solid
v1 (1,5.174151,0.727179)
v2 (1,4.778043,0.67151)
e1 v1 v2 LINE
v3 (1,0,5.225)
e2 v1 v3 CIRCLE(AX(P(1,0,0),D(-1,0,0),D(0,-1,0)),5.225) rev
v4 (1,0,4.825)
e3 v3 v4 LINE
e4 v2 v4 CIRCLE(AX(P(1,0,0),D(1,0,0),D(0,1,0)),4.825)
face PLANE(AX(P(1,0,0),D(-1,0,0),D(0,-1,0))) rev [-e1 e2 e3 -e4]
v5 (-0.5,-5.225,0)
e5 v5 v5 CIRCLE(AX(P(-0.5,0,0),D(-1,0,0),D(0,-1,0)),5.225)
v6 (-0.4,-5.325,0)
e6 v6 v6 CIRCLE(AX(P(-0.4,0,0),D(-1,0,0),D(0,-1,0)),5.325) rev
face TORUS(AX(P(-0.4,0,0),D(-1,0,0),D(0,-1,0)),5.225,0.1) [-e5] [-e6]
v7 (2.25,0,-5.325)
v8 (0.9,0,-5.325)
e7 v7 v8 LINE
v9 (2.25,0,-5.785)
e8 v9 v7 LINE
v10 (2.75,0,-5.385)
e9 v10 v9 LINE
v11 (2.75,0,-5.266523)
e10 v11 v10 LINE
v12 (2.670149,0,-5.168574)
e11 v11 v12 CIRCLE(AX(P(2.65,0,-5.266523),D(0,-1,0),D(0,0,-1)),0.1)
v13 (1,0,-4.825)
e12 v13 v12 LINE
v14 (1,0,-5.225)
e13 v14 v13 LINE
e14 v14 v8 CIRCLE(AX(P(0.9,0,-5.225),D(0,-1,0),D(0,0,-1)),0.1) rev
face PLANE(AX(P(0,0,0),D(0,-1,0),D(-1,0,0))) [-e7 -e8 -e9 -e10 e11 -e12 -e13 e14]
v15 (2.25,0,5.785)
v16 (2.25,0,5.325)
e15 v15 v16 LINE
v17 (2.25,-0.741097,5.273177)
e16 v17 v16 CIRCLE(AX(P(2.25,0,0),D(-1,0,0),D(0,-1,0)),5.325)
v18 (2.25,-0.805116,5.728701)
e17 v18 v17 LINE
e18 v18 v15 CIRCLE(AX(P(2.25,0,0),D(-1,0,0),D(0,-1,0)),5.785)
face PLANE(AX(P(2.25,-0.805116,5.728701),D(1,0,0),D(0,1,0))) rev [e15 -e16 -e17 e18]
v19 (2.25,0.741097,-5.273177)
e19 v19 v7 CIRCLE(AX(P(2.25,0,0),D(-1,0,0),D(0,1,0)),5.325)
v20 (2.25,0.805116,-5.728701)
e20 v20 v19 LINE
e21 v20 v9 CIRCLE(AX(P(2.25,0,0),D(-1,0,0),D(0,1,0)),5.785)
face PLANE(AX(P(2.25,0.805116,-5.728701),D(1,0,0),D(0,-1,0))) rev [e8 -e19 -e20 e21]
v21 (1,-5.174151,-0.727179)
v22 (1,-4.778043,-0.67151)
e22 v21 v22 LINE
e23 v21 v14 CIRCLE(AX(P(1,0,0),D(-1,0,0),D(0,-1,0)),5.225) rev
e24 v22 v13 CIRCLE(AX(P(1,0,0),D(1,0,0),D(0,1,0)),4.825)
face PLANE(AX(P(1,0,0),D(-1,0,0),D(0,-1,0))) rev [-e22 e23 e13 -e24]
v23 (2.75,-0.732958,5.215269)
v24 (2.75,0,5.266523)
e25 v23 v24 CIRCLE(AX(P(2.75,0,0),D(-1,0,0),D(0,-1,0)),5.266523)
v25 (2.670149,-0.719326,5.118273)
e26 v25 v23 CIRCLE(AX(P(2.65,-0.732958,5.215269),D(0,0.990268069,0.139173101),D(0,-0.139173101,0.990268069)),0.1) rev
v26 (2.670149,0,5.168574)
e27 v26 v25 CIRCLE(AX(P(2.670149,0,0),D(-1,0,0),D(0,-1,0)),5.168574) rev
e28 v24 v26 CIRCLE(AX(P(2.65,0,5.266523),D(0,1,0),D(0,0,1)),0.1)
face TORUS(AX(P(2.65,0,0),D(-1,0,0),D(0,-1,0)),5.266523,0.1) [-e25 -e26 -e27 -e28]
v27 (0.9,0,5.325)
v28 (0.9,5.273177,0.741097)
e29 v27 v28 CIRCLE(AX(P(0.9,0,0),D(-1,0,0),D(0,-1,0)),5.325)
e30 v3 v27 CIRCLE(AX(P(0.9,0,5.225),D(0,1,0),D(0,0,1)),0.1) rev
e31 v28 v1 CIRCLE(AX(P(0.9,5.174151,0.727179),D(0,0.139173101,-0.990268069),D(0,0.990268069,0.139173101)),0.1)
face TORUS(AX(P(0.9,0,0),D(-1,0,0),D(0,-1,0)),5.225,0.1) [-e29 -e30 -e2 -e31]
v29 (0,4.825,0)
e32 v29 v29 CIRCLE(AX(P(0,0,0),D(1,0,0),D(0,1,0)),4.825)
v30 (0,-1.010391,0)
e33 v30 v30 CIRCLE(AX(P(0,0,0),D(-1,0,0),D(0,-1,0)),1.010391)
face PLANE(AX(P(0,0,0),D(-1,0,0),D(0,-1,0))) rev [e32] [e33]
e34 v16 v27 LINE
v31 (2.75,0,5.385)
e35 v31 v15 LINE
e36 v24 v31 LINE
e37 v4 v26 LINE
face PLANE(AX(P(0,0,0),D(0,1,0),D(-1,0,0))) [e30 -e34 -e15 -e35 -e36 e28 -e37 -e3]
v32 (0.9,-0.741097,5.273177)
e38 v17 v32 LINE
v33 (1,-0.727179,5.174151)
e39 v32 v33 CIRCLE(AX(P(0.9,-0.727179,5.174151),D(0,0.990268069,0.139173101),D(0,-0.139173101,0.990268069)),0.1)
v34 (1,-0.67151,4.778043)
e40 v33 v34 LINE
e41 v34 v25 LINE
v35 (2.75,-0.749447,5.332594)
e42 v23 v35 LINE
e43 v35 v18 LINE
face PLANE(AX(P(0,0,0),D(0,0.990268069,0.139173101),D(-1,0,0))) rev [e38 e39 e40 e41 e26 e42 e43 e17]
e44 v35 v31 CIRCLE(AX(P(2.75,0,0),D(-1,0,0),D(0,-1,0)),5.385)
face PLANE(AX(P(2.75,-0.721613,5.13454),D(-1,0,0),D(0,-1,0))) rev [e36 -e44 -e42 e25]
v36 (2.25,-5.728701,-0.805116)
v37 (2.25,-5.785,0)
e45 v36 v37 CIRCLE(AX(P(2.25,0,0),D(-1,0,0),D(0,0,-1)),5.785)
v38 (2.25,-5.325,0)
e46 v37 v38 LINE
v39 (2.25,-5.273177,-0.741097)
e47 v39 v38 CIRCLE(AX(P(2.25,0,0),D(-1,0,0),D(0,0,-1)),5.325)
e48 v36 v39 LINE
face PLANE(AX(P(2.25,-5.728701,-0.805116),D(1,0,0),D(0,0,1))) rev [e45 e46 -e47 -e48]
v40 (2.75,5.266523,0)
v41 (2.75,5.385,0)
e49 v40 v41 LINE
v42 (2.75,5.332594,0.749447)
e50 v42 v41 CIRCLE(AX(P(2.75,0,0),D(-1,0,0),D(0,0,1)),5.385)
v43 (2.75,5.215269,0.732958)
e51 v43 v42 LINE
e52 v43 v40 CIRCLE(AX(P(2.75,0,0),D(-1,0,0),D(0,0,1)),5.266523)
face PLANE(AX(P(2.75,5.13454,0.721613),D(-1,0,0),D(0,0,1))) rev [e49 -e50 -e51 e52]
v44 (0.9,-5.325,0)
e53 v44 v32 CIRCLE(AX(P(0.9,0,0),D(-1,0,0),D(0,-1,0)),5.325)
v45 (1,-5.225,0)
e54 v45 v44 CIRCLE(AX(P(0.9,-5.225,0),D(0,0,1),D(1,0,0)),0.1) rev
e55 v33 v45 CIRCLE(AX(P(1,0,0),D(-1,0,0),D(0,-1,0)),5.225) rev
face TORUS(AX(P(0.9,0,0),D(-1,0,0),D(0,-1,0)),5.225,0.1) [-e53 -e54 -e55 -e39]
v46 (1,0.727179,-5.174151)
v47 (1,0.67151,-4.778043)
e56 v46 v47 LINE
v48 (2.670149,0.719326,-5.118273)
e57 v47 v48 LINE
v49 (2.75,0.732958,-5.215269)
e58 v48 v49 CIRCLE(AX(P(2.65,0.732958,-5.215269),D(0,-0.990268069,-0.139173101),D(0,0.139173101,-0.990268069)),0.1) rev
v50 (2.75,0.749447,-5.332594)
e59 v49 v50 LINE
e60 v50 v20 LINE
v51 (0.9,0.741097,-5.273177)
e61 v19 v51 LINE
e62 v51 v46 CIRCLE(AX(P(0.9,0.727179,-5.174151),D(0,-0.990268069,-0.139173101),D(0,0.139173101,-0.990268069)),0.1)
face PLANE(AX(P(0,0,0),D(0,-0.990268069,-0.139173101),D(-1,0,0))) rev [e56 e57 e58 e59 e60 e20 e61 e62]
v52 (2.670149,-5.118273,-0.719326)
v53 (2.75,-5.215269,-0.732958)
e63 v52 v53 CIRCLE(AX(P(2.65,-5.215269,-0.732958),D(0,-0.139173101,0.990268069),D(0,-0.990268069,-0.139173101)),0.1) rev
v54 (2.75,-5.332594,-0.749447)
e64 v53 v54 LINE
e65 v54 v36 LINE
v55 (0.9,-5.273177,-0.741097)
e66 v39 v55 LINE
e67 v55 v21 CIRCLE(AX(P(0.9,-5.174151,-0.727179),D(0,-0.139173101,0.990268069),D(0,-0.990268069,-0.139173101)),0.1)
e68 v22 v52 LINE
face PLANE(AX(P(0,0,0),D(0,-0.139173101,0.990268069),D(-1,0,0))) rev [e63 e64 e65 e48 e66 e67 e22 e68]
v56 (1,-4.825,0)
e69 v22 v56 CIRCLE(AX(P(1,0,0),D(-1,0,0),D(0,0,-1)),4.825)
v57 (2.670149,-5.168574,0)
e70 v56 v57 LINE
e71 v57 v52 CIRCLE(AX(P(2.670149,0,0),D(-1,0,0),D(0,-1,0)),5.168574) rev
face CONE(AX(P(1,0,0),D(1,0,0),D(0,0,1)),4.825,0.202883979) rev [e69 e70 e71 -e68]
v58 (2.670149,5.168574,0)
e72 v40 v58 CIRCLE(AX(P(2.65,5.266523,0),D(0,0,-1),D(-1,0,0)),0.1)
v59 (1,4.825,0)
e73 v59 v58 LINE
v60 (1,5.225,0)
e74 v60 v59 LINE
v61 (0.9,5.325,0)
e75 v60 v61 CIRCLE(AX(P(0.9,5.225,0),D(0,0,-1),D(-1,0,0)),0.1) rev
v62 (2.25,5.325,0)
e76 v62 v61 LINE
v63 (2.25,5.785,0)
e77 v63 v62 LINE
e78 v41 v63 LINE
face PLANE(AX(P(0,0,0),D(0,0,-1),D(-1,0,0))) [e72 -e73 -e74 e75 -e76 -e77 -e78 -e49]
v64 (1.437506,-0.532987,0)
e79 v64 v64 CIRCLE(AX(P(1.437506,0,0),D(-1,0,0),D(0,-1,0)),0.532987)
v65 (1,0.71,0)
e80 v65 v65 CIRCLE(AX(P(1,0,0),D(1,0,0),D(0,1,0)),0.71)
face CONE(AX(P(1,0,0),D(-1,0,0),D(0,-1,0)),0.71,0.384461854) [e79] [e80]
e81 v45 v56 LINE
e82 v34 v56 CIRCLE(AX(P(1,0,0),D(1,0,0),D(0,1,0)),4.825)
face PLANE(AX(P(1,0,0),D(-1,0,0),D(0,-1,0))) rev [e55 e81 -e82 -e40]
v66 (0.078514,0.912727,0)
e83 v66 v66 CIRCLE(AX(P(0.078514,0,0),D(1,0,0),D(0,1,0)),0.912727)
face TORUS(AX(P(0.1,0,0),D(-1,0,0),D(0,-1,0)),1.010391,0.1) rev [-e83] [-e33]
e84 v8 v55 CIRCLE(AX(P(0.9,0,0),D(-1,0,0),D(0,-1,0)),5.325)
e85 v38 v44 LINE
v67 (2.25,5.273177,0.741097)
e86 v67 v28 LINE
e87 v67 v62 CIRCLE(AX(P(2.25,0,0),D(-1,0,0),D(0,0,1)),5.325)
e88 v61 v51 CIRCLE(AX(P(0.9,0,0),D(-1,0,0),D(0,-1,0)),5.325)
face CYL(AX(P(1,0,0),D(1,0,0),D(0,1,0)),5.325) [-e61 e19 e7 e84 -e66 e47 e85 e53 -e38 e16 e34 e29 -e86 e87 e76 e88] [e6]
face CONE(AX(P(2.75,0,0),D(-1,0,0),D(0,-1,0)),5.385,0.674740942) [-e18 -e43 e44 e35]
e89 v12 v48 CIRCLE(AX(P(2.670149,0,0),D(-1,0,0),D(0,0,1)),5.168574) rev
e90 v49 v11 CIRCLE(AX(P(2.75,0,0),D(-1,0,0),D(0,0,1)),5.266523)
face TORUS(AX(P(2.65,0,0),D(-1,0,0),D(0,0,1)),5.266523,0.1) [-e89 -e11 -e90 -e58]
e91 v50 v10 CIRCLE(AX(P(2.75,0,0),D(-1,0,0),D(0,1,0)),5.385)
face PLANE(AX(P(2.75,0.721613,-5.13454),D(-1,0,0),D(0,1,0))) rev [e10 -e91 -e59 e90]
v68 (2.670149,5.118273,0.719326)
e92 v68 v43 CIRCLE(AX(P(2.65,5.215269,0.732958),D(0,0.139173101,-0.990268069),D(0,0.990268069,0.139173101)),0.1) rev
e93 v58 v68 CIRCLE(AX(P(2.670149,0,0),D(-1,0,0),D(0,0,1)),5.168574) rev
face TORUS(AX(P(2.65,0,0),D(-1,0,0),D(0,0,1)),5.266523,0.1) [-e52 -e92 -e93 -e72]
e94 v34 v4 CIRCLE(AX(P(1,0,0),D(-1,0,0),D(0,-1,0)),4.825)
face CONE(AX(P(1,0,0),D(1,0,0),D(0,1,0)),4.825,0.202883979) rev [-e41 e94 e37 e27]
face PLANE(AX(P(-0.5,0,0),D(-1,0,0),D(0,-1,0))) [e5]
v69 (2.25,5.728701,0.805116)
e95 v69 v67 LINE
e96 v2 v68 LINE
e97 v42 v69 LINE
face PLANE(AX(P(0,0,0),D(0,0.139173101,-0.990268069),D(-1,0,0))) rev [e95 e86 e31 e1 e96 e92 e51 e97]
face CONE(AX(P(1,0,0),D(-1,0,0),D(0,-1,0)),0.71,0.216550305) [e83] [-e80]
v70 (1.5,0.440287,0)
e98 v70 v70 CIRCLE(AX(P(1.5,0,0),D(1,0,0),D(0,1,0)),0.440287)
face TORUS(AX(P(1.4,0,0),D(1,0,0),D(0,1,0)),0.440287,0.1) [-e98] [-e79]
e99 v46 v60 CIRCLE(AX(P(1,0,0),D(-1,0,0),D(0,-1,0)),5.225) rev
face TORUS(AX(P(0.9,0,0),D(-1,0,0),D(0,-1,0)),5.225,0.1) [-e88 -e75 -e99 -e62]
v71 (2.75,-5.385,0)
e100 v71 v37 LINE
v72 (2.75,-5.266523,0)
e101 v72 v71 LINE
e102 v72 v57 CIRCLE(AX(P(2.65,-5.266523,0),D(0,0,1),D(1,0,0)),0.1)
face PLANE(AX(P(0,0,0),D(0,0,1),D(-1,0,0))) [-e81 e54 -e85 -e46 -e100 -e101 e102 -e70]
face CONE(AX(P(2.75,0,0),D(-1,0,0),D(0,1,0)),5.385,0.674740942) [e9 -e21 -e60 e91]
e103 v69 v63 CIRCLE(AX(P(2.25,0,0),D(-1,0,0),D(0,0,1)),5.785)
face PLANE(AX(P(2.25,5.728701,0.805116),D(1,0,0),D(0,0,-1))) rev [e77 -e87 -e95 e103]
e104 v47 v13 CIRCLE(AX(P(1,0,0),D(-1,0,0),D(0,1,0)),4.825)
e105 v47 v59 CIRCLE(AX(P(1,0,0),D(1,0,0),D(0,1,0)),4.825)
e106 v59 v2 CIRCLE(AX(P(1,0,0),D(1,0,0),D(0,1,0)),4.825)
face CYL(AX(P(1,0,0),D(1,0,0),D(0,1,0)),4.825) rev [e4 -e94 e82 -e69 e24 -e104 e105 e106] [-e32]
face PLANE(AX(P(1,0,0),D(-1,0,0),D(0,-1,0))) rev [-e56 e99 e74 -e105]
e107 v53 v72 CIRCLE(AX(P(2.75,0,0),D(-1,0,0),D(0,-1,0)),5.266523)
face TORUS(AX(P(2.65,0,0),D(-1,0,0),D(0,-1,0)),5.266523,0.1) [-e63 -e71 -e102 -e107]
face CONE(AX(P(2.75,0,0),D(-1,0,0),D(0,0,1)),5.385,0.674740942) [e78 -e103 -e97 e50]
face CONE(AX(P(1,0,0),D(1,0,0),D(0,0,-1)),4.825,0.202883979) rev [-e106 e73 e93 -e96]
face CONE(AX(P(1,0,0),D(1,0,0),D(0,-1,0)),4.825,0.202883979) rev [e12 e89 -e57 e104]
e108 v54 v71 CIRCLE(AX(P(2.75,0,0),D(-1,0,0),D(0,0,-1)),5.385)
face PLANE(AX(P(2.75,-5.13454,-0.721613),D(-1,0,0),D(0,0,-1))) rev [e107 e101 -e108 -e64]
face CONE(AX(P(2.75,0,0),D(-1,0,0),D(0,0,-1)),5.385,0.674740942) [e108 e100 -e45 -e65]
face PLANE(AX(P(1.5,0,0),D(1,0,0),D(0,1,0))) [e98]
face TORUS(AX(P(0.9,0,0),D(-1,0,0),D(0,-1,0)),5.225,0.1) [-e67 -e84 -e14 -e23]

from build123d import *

# Parameters (mm, degrees)
REVOLVE6_ANGLE    = 8
CIRPATTERN2_COUNT = 4
FILLET2_R         = 0.1


with BuildPart() as part:
    # Sketch1 → Revolve2 (revolve)
    with BuildSketch(Plane.XY):
        Polygon((1, 5.325), (0, 5.325), (-0.5, 5.325), (-0.5, 4.885), (-0.5, 1.49), (-0.5, 0), (0.25, 0), (1, 0), (1.5, 0), (1.5, 0.507702176), (1, 0.71), (0, 0.93), (0, 4.825), (1, 4.825), align=None)
    revolve(axis=Axis((1, 0, 0), (-1, 0, 0)))

    # Sketch4 → Revolve6 (revolve)
    with BuildSketch(Plane.XY):
        Polygon((2.75, 5.185), (2.75, 5.385), (2.25, 5.785), (2.25, 5.325), (1, 5.325), (1, 5.185), (1, 4.825), align=None)
    revolve6 = revolve(axis=Axis((0, 0, 0), (1, 0, 0)), revolution_arc=REVOLVE6_ANGLE)

    # CirPattern2: Revolve6 ×4 about axis
    cirpattern2_axis = Axis((0, 0, 0), (-1, 0, 0))
    for i in range(1, CIRPATTERN2_COUNT):
        add(revolve6.rotate(cirpattern2_axis, i * 360 / CIRPATTERN2_COUNT))

    # Fillet2
    # the kernel refuses this fillet: 0.1 mm, written as the material it adds along each edge
    with BuildSketch(Plane(origin=(0, 0, 0), x_dir=(0, 1, 0), z_dir=(0, 0, 1))) as fillet2_piece_1:
        with BuildLine():
            CenterArc((0.93 + FILLET2_R * 0.803914058894, -FILLET2_R), FILLET2_R, 90, 77.592581473)
            Line((0.93 - FILLET2_R * 0.172730407811, -FILLET2_R * 0.785138217325), (0.93, 0))
            Line((0.93, 0), (0.93 + FILLET2_R * 0.803914058894, 0))
        make_face()
    revolve(axis=Axis((0, 0, 0), (-1, 0, 0)))
    # the kernel refuses this fillet: 0.1 mm, written as the material it takes off along each edge
    with BuildSketch(Plane(origin=(1.5, 0, 0), x_dir=(0, 1, 0), z_dir=(0, 0, 1))) as fillet2_2_piece_1:
        with BuildLine():
            CenterArc((0.507702176 - FILLET2_R * 0.674152532906, FILLET2_R), FILLET2_R, 270, 67.971958378)
            Line((0.507702176 - FILLET2_R * 0.674152532906, 0), (0.507702176, 0))
            Line((0.507702176, 0), (0.507702176 + FILLET2_R * 0.252847871179, FILLET2_R * 0.62493967042))
        make_face()
    revolve(axis=Axis((1.5, 0, 0), (-1, 0, 0)), mode=Mode.SUBTRACT)
    with BuildSketch(Plane(origin=(1, 0, 0), x_dir=(0, 1, 0), z_dir=(0, 0, 1))) as fillet2_2_piece_2:
        with BuildLine():
            CenterArc((5.325 - FILLET2_R, FILLET2_R), FILLET2_R, 270, 90)
            Line((5.325, FILLET2_R), (5.325, 0))
            Line((5.325, 0), (5.325 - FILLET2_R, 0))
        make_face()
    revolve(axis=Axis((1, 0, 0), (-1, 0, 0)), revolution_arc=82, mode=Mode.SUBTRACT)
    with BuildSketch(Plane(origin=(2.75, 0, 0), x_dir=(0, -0.03929693023506649, -0.9992275773186509), z_dir=(0, -0.9992275773186509, 0.03929693023506649))) as fillet2_2_piece_3:
        with BuildLine():
            CenterArc((5.185 + FILLET2_R * 0.815225657351, -FILLET2_R), FILLET2_R, 90, 78.375604276)
            Line((5.185 + FILLET2_R * 0.815225657351, 0), (5.185, 0))
            Line((5.185, 0), (5.185 - FILLET2_R * 0.164263887349, -FILLET2_R * 0.798505007947))
        make_face()
    revolve(axis=Axis((2.75, 0, 0), (1, 0, 0)), revolution_arc=12.50425629, mode=Mode.SUBTRACT)
    with BuildSketch(Plane(origin=(1, 0, 0), x_dir=(0, 0, -1), z_dir=(0, 1, 0))) as fillet2_2_piece_4:
        with BuildLine():
            CenterArc((5.325 - FILLET2_R, FILLET2_R), FILLET2_R, 270, 90)
            Line((5.325, FILLET2_R), (5.325, 0))
            Line((5.325, 0), (5.325 - FILLET2_R, 0))
        make_face()
    revolve(axis=Axis((1, 0, 0), (-1, 0, 0)), revolution_arc=82, mode=Mode.SUBTRACT)
    with BuildSketch(Plane(origin=(2.75, 0, 0), x_dir=(0, -0.9992275773186509, 0.039296930235066474), z_dir=(0, 0.039296930235066474, 0.9992275773186509))) as fillet2_2_piece_5:
        with BuildLine():
            CenterArc((5.185 + FILLET2_R * 0.815225657351, -FILLET2_R), FILLET2_R, 90, 78.375604276)
            Line((5.185 + FILLET2_R * 0.815225657351, 0), (5.185, 0))
            Line((5.185, 0), (5.185 - FILLET2_R * 0.164263887349, -FILLET2_R * 0.798505007947))
        make_face()
    revolve(axis=Axis((2.75, 0, 0), (1, 0, 0)), revolution_arc=12.50425629, mode=Mode.SUBTRACT)
    with BuildSketch(Plane(origin=(1, 0, 0), x_dir=(0, -1, 0), z_dir=(0, 0, -1))) as fillet2_2_piece_6:
        with BuildLine():
            CenterArc((5.325 - FILLET2_R, FILLET2_R), FILLET2_R, 270, 90)
            Line((5.325, FILLET2_R), (5.325, 0))
            Line((5.325, 0), (5.325 - FILLET2_R, 0))
        make_face()
    revolve(axis=Axis((1, 0, 0), (-1, 0, 0)), revolution_arc=82, mode=Mode.SUBTRACT)
    with BuildSketch(Plane(origin=(2.75, 0, 0), x_dir=(0, 0.039296930235066384, 0.9992275773186509), z_dir=(0, 0.9992275773186509, -0.039296930235066384))) as fillet2_2_piece_7:
        with BuildLine():
            CenterArc((5.185 + FILLET2_R * 0.815225657351, -FILLET2_R), FILLET2_R, 90, 78.375604276)
            Line((5.185 + FILLET2_R * 0.815225657351, 0), (5.185, 0))
            Line((5.185, 0), (5.185 - FILLET2_R * 0.164263887349, -FILLET2_R * 0.798505007947))
        make_face()
    revolve(axis=Axis((2.75, 0, 0), (1, 0, 0)), revolution_arc=12.50425629, mode=Mode.SUBTRACT)
    with BuildSketch(Plane(origin=(1, 0, 0), x_dir=(0, 0, 1), z_dir=(0, -1, 0))) as fillet2_2_piece_8:
        with BuildLine():
            CenterArc((5.325 - FILLET2_R, FILLET2_R), FILLET2_R, 270, 90)
            Line((5.325, FILLET2_R), (5.325, 0))
            Line((5.325, 0), (5.325 - FILLET2_R, 0))
        make_face()
    revolve(axis=Axis((1, 0, 0), (-1, 0, 0)), revolution_arc=82, mode=Mode.SUBTRACT)
    with BuildSketch(Plane(origin=(2.75, 0, 0), x_dir=(0, 0.9992275773186509, -0.0392969302350666), z_dir=(0, -0.0392969302350666, -0.9992275773186509))) as fillet2_2_piece_9:
        with BuildLine():
            CenterArc((5.185 + FILLET2_R * 0.815225657351, -FILLET2_R), FILLET2_R, 90, 78.375604276)
            Line((5.185 + FILLET2_R * 0.815225657351, 0), (5.185, 0))
            Line((5.185, 0), (5.185 - FILLET2_R * 0.164263887349, -FILLET2_R * 0.798505007947))
        make_face()
    revolve(axis=Axis((2.75, 0, 0), (1, 0, 0)), revolution_arc=12.50425629, mode=Mode.SUBTRACT)
    with BuildSketch(Plane(origin=(-0.5, 0, 0), x_dir=(0, 1, 0), z_dir=(0, 0, 1))) as fillet2_2_piece_10:
        with BuildLine():
            CenterArc((5.325 - FILLET2_R, -FILLET2_R), FILLET2_R, 0, 90)
            Line((5.325 - FILLET2_R, 0), (5.325, 0))
            Line((5.325, 0), (5.325, -FILLET2_R))
        make_face()
    revolve(axis=Axis((-0.5, 0, 0), (-1, 0, 0)), mode=Mode.SUBTRACT)


solid = part.part
